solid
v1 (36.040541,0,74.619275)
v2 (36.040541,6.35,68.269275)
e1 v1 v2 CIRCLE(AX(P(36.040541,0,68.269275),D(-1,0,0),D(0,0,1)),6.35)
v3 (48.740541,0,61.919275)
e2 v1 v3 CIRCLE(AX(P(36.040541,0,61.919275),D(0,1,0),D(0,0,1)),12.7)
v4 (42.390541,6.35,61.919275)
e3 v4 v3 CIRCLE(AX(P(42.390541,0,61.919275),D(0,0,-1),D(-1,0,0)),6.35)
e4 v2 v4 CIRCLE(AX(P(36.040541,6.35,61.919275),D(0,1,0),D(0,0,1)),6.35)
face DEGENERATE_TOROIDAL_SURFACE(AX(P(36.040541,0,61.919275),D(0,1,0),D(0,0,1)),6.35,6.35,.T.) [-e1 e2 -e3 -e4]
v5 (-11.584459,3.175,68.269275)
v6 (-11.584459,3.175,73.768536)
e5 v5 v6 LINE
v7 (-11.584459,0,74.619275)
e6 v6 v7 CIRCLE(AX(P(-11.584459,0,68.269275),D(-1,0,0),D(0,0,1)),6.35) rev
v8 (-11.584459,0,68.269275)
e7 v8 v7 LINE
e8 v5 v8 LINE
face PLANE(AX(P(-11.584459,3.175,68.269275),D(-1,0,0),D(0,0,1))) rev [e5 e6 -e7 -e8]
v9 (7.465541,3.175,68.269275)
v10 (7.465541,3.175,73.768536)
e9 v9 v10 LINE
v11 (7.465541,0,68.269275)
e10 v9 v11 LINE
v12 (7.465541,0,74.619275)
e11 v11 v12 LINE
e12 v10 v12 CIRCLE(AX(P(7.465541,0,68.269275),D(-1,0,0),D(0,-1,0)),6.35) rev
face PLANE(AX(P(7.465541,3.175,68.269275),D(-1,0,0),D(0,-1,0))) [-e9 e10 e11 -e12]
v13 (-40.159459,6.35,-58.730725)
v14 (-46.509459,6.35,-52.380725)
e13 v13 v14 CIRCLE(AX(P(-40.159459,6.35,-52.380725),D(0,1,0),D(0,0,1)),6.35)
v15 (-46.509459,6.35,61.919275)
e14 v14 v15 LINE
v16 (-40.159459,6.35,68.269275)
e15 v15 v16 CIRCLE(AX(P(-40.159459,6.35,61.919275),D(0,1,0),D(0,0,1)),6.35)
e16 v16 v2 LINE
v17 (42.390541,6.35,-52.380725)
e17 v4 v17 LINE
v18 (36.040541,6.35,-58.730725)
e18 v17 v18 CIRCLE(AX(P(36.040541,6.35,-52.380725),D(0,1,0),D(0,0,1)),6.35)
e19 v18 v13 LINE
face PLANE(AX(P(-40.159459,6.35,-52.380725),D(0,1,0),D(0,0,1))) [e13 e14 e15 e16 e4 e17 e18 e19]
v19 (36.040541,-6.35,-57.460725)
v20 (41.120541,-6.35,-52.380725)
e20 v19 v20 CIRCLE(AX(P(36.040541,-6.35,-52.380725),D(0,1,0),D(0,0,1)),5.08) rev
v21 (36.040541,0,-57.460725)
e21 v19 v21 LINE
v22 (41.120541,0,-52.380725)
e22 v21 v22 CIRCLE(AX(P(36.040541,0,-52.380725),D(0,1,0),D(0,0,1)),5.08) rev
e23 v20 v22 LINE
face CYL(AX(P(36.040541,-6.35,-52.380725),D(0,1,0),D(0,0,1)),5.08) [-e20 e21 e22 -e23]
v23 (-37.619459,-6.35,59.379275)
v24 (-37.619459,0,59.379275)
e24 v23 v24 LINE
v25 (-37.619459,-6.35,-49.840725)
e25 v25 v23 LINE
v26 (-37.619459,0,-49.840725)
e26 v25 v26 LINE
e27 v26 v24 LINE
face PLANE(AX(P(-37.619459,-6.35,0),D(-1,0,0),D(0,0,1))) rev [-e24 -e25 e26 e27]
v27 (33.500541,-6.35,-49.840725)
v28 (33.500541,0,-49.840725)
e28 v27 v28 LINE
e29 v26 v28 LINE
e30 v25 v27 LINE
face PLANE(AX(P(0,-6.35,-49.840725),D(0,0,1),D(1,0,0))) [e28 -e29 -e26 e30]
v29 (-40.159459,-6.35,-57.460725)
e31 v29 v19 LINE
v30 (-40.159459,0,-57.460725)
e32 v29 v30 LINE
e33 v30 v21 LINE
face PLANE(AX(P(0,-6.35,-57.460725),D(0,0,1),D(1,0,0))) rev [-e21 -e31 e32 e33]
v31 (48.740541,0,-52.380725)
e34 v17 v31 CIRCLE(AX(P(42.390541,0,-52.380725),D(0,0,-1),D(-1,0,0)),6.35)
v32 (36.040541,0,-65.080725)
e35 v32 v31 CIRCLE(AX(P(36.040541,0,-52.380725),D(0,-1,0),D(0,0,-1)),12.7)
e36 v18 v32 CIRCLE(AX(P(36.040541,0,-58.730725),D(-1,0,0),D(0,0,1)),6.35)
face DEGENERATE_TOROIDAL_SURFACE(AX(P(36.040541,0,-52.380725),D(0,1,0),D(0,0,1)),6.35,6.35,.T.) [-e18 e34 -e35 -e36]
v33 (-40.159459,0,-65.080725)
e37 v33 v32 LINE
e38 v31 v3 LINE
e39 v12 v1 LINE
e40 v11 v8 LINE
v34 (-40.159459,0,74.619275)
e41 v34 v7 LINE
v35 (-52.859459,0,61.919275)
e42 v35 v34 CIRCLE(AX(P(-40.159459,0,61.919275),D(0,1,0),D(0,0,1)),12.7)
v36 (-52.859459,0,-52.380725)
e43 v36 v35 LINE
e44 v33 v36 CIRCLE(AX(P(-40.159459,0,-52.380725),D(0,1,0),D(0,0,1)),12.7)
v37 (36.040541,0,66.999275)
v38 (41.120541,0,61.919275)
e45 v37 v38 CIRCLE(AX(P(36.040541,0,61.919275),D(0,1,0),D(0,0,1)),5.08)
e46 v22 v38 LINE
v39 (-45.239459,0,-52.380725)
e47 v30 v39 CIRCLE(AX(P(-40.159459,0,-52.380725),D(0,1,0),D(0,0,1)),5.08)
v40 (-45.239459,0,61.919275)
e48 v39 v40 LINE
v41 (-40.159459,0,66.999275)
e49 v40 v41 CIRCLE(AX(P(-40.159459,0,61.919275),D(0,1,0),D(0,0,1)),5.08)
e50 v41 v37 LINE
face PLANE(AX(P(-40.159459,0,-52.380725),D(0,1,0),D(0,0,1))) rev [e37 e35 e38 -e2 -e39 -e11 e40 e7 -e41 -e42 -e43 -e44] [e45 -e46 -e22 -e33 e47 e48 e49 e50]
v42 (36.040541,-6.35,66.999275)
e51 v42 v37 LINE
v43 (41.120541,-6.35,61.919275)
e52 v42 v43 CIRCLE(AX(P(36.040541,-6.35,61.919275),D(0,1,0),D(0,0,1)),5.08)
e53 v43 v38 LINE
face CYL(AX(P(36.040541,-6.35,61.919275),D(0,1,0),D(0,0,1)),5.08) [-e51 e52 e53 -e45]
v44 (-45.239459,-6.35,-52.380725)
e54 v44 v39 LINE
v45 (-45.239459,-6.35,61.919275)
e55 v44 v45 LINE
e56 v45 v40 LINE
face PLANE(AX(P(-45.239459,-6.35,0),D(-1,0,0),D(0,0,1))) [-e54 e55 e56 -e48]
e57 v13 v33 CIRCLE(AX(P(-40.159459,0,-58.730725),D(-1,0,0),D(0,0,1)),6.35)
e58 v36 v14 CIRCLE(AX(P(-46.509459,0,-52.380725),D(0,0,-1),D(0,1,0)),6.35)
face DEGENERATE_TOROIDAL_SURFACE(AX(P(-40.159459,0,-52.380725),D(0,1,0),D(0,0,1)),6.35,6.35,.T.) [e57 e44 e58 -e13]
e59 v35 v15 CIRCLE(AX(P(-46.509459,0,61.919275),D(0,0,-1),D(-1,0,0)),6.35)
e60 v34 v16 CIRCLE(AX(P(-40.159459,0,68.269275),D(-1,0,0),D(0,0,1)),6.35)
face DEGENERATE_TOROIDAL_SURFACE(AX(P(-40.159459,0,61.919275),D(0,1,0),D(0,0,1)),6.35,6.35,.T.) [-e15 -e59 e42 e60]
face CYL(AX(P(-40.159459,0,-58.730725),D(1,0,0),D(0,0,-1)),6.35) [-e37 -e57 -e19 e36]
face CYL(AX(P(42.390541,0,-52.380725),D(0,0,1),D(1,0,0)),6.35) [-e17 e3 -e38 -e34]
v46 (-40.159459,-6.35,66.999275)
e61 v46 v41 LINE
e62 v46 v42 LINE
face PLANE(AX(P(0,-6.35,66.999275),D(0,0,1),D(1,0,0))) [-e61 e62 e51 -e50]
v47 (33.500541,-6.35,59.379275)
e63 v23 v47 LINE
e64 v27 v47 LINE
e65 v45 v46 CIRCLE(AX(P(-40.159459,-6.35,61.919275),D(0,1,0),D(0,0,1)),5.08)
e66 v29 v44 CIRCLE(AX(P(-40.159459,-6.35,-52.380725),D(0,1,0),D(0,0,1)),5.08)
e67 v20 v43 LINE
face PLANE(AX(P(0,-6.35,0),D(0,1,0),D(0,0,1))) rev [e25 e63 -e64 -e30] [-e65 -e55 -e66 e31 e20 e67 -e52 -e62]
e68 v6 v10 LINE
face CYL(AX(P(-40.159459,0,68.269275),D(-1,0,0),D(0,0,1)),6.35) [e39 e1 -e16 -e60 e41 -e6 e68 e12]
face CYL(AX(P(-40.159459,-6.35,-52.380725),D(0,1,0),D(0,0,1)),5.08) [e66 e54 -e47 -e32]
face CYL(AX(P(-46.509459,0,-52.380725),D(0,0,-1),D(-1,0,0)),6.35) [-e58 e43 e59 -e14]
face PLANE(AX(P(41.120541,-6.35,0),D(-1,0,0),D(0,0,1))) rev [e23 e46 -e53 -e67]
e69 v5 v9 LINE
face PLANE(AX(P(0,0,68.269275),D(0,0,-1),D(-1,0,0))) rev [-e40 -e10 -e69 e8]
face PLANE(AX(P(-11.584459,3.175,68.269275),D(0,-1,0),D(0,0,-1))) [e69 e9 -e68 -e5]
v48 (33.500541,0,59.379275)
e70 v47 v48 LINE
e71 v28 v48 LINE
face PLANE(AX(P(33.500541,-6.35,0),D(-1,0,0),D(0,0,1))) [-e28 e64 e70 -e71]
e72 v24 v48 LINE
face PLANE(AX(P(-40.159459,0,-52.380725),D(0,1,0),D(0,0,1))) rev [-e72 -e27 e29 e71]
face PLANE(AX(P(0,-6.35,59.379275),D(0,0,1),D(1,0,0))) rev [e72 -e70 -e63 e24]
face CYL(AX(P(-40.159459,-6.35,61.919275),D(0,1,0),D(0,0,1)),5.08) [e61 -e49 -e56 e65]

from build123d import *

# Parameters (mm, degrees)
SKETCH1_W           = 71.12
SKETCH1_H           = 109.22
BOSS_EXTRUDE1_DEPTH = 6.35
BOSS_EXTRUDE3_DEPTH = 6.35
FILLET1_R           = 6.35
SKETCH3_W           = 19.05
SKETCH3_H           = 6.35
CUT_EXTRUDE1_DEPTH  = 6.35


with BuildPart() as part:
    # Sketch1 → Boss-Extrude1 (new body)
    with BuildSketch(Plane(origin=(0, 0, 0), x_dir=(1, 0, 0), z_dir=(0, 1, 0))):
        with BuildLine():
            Line((-40.159459459, 57.460725462), (36.040540541, 57.460725462))
            ThreePointArc((36.040540541, 57.460725462), (39.632642989, 55.972827911), (41.120540541, 52.380725462))
            Line((41.120540541, 52.380725462), (41.120540541, -61.919274538))
            ThreePointArc((41.120540541, -61.919274538), (39.632642989, -65.511376986), (36.040540541, -66.999274538))
            Line((36.040540541, -66.999274538), (-40.159459459, -66.999274538))
            ThreePointArc((-40.159459459, -66.999274538), (-43.751561908, -65.511376986), (-45.239459459, -61.919274538))
            Line((-45.239459459, -61.919274538), (-45.239459459, 52.380725462))
            ThreePointArc((-45.239459459, 52.380725462), (-43.751561908, 55.972827911), (-40.159459459, 57.460725462))
        make_face()
        with Locations((-2.059459459, -4.769274538)):
            Rectangle(SKETCH1_W, SKETCH1_H, mode=Mode.SUBTRACT)
    extrude(amount=-BOSS_EXTRUDE1_DEPTH)

    # Sketch1<4> → Boss-Extrude3 (add)
    with BuildSketch(Plane(origin=(0, 0, 0), x_dir=(1, 0, 0), z_dir=(0, 1, 0))):
        with BuildLine():
            Line((-40.159459459, 65.080725462), (36.040540541, 65.080725462))
            ThreePointArc((36.040540541, 65.080725462), (45.020796662, 61.360981583), (48.740540541, 52.380725462))
            Line((48.740540541, 52.380725462), (48.740540541, -61.919274538))
            ThreePointArc((48.740540541, -61.919274538), (45.020796662, -70.899530659), (36.040540541, -74.619274538))
            Line((36.040540541, -74.619274538), (-40.159459459, -74.619274538))
            ThreePointArc((-40.159459459, -74.619274538), (-49.139715581, -70.899530659), (-52.859459459, -61.919274538))
            Line((-52.859459459, -61.919274538), (-52.859459459, 52.380725462))
            ThreePointArc((-52.859459459, 52.380725462), (-49.139715581, 61.360981583), (-40.159459459, 65.080725462))
        make_face()
    extrude(amount=BOSS_EXTRUDE3_DEPTH)

    # Fillet1
    fillet1_edges = [part.edges().sort_by_distance(p)[0] for p in [
        (-49.139715581, 6.35, -61.360981583),
        (-2.059459459, 6.35, -65.080725462),
        (45.020796662, 6.35, -61.360981583),
        (48.740540541, 6.35, 4.769274538),
        (45.020796662, 6.35, 70.899530659),
        (-2.059459459, 6.35, 74.619274538),
        (-49.139715581, 6.35, 70.899530659),
        (-52.859459459, 6.35, 4.769274538),
    ]]
    fillet(fillet1_edges, radius=FILLET1_R - 0.0001)  # a hair under: the kernel refuses the full size

    # Sketch3 → Cut-Extrude1 (cut)
    with BuildSketch(Plane.XY.offset(74.619274538)):
        with Locations((-2.059459459, 0)):
            Rectangle(SKETCH3_W, SKETCH3_H)
    extrude(amount=-CUT_EXTRUDE1_DEPTH, mode=Mode.SUBTRACT)


solid = part.part
